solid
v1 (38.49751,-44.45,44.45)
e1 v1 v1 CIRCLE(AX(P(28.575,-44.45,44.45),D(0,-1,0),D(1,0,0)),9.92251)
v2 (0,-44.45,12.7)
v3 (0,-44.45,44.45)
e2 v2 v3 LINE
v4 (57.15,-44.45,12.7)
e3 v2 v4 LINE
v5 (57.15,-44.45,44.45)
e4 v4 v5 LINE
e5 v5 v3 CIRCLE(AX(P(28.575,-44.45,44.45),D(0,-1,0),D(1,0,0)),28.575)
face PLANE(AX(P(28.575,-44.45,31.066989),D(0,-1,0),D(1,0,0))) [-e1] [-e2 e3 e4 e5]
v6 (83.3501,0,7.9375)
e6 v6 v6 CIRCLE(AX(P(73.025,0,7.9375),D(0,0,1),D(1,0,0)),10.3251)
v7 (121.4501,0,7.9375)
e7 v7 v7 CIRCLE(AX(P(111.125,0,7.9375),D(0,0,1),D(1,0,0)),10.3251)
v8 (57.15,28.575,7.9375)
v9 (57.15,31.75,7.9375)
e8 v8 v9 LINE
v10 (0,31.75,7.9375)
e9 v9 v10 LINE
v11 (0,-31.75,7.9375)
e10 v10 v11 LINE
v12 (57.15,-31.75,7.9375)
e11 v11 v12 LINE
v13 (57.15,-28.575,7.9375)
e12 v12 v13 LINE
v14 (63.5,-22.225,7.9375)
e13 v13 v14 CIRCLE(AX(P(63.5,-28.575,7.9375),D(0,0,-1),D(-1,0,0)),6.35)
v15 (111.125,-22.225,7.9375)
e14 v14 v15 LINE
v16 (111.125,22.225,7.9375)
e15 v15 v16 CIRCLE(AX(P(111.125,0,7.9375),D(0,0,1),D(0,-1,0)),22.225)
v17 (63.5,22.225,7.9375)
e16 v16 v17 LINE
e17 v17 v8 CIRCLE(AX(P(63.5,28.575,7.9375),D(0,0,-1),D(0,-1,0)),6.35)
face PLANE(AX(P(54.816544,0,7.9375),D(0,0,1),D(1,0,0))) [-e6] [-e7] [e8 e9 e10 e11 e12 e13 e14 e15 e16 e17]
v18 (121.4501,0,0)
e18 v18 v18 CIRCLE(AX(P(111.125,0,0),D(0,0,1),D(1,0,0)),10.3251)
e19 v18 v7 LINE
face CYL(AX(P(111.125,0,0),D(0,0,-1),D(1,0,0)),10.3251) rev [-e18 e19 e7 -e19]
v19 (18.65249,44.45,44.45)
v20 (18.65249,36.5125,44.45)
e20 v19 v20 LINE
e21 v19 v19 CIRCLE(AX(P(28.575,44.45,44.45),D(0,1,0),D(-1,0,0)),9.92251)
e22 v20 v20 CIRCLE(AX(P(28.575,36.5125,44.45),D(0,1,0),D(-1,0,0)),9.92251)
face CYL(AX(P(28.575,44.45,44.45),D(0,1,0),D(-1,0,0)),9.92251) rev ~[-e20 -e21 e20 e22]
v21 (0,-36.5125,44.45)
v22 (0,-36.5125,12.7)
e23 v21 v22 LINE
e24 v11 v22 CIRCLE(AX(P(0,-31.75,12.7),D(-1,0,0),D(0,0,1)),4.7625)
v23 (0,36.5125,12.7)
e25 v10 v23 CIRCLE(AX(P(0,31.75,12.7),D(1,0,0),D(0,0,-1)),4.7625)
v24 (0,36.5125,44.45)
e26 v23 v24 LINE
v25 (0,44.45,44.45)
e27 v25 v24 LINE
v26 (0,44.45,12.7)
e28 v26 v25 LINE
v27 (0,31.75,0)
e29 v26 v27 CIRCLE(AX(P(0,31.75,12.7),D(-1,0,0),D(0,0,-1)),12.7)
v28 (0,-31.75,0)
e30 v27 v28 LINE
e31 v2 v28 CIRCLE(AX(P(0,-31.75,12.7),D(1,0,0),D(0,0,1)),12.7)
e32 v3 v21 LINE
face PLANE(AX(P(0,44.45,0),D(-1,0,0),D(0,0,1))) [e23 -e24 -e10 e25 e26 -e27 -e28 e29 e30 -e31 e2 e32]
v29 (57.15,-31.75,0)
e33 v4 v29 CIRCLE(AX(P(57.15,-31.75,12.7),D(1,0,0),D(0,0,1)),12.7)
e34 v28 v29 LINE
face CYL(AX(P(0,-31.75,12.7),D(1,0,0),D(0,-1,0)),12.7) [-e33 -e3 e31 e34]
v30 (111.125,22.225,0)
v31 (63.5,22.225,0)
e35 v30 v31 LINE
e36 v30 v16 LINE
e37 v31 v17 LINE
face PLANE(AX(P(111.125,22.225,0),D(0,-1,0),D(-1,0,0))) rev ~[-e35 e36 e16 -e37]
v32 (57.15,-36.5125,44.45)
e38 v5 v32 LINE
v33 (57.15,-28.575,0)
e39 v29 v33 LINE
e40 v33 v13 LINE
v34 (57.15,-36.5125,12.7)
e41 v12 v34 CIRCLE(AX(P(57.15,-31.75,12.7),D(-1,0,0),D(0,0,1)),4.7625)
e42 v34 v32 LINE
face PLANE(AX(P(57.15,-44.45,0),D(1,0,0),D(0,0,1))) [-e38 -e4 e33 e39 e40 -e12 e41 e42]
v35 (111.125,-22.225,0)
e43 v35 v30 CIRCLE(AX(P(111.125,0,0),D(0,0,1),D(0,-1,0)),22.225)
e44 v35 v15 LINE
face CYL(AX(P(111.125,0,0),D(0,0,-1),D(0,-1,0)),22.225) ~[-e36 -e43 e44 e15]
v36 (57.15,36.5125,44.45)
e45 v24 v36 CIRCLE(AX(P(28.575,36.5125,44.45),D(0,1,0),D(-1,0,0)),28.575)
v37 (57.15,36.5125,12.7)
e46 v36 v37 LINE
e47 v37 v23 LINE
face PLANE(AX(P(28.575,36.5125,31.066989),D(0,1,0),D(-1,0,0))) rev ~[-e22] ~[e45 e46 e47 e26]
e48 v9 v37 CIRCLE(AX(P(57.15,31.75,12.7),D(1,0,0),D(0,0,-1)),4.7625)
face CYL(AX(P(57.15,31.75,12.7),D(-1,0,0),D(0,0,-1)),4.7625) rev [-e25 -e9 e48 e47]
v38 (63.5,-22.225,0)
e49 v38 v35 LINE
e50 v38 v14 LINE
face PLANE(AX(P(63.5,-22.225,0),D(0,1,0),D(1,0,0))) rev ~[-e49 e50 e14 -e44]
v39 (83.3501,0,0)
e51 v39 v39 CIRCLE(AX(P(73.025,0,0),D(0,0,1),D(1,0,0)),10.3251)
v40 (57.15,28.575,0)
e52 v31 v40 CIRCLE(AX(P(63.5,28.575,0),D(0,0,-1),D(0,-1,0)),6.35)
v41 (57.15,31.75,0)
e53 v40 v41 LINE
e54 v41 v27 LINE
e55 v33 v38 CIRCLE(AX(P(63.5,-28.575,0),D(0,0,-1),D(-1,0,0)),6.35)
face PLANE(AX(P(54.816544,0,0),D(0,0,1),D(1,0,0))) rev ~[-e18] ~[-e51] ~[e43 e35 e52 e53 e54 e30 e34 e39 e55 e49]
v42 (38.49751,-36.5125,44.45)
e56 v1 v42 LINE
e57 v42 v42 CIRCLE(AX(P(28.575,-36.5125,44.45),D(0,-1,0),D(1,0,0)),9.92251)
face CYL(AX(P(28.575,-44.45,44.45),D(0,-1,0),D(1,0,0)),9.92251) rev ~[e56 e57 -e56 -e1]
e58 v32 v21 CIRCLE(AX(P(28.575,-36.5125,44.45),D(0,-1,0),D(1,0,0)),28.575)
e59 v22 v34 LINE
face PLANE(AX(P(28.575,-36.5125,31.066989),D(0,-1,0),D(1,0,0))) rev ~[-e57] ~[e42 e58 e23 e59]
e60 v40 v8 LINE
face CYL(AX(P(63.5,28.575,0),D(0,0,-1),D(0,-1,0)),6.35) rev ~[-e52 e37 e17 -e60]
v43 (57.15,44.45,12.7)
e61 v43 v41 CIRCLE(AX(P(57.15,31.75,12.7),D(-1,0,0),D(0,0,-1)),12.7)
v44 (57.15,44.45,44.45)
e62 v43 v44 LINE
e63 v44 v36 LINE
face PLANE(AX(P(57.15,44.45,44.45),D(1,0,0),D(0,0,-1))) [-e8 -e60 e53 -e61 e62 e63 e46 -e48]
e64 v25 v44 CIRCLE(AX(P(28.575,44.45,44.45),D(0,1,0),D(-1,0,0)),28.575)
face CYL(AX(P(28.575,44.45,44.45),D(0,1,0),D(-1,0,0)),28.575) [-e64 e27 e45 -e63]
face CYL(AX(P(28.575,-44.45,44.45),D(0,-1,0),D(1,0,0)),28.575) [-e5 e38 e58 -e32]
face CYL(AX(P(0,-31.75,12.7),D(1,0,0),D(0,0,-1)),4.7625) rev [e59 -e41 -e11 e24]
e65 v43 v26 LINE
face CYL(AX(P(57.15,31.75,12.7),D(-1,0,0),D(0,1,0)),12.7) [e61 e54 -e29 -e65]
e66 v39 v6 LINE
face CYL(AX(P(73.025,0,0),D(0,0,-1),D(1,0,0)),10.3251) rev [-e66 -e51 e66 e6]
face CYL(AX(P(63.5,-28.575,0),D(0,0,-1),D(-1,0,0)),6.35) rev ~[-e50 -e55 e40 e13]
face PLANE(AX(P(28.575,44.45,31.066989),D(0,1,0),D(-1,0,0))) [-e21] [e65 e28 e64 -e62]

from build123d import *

# Parameters (mm, degrees)
F0_R     = 10.3251
F1_DEPTH = 7.9375
F3_R     = 9.92251
F4_DEPTH = 7.9375
F6_R     = 9.92251
F7_DEPTH = 7.9375
F8_R     = 12.7
F9_R     = 4.7625


with BuildPart() as f1:
    # F0 (on Top) → F1 (new body)
    with BuildSketch(Plane.XY):
        with BuildLine():
            Line((57.15, 44.45), (0, 44.45))
            Line((0, 44.45), (0, -44.45))
            Line((0, -44.45), (57.15, -44.45))
            Line((57.15, -44.45), (57.15, -28.575))
            ThreePointArc((57.15, -28.575), (59.0098719395, -24.0848719395), (63.5, -22.225))
            Line((63.5, -22.225), (111.125, -22.225))
            ThreePointArc((111.125, -22.225), (133.35, 0), (111.125, 22.225))
            Line((111.125, 22.225), (63.5, 22.225))
            ThreePointArc((63.5, 22.225), (59.0098719395, 24.0848719395), (57.15, 28.575))
            Line((57.15, 28.575), (57.15, 44.45))
        make_face()
        with Locations((73.025, 0)):
            Circle(F0_R, mode=Mode.SUBTRACT)
        with Locations((111.125, 0)):
            Circle(F0_R, mode=Mode.SUBTRACT)
    extrude(amount=F1_DEPTH)

    # F3 (on offset) → F4 (join)
    with BuildSketch(Plane.XZ.offset(44.45)):
        with BuildLine():
            Line((0, 44.45), (0, 0))
            Line((0, 0), (57.15, 0))
            Line((57.15, 0), (57.15, 44.45))
            ThreePointArc((57.15, 44.45), (28.575, 73.025), (0, 44.45))
        make_face()
        with Locations((28.575, 44.45)):
            Circle(F3_R, mode=Mode.SUBTRACT)
    extrude(amount=-F4_DEPTH)

    # F6 (on offset) → F7 (join)
    with BuildSketch(Plane(origin=(0, 44.45, 0), x_dir=(-1, 0, 0), z_dir=(0, 1, 0))):
        with BuildLine():
            Line((-57.15, 44.45), (-57.15, 0))
            Line((-57.15, 0), (0, 0))
            Line((0, 0), (0, 44.45))
            ThreePointArc((0, 44.45), (-28.575, 73.025), (-57.15, 44.45))
        make_face()
        with Locations((-28.575, 44.45)):
            Circle(F6_R, mode=Mode.SUBTRACT)
    extrude(amount=-F7_DEPTH)

    # F8
    f8_edges = [f1.edges().sort_by_distance(p)[0] for p in [
        (28.575, 44.45, 0),
        (28.575, -44.45, 0),
    ]]
    fillet(f8_edges, radius=F8_R)

    # F9
    f9_edges = [f1.edges().sort_by_distance(p)[0] for p in [
        (28.575, 36.5125, 7.9375),
        (28.575, -36.5125, 7.9375),
    ]]
    fillet(f9_edges, radius=F9_R)


solid = f1.part
